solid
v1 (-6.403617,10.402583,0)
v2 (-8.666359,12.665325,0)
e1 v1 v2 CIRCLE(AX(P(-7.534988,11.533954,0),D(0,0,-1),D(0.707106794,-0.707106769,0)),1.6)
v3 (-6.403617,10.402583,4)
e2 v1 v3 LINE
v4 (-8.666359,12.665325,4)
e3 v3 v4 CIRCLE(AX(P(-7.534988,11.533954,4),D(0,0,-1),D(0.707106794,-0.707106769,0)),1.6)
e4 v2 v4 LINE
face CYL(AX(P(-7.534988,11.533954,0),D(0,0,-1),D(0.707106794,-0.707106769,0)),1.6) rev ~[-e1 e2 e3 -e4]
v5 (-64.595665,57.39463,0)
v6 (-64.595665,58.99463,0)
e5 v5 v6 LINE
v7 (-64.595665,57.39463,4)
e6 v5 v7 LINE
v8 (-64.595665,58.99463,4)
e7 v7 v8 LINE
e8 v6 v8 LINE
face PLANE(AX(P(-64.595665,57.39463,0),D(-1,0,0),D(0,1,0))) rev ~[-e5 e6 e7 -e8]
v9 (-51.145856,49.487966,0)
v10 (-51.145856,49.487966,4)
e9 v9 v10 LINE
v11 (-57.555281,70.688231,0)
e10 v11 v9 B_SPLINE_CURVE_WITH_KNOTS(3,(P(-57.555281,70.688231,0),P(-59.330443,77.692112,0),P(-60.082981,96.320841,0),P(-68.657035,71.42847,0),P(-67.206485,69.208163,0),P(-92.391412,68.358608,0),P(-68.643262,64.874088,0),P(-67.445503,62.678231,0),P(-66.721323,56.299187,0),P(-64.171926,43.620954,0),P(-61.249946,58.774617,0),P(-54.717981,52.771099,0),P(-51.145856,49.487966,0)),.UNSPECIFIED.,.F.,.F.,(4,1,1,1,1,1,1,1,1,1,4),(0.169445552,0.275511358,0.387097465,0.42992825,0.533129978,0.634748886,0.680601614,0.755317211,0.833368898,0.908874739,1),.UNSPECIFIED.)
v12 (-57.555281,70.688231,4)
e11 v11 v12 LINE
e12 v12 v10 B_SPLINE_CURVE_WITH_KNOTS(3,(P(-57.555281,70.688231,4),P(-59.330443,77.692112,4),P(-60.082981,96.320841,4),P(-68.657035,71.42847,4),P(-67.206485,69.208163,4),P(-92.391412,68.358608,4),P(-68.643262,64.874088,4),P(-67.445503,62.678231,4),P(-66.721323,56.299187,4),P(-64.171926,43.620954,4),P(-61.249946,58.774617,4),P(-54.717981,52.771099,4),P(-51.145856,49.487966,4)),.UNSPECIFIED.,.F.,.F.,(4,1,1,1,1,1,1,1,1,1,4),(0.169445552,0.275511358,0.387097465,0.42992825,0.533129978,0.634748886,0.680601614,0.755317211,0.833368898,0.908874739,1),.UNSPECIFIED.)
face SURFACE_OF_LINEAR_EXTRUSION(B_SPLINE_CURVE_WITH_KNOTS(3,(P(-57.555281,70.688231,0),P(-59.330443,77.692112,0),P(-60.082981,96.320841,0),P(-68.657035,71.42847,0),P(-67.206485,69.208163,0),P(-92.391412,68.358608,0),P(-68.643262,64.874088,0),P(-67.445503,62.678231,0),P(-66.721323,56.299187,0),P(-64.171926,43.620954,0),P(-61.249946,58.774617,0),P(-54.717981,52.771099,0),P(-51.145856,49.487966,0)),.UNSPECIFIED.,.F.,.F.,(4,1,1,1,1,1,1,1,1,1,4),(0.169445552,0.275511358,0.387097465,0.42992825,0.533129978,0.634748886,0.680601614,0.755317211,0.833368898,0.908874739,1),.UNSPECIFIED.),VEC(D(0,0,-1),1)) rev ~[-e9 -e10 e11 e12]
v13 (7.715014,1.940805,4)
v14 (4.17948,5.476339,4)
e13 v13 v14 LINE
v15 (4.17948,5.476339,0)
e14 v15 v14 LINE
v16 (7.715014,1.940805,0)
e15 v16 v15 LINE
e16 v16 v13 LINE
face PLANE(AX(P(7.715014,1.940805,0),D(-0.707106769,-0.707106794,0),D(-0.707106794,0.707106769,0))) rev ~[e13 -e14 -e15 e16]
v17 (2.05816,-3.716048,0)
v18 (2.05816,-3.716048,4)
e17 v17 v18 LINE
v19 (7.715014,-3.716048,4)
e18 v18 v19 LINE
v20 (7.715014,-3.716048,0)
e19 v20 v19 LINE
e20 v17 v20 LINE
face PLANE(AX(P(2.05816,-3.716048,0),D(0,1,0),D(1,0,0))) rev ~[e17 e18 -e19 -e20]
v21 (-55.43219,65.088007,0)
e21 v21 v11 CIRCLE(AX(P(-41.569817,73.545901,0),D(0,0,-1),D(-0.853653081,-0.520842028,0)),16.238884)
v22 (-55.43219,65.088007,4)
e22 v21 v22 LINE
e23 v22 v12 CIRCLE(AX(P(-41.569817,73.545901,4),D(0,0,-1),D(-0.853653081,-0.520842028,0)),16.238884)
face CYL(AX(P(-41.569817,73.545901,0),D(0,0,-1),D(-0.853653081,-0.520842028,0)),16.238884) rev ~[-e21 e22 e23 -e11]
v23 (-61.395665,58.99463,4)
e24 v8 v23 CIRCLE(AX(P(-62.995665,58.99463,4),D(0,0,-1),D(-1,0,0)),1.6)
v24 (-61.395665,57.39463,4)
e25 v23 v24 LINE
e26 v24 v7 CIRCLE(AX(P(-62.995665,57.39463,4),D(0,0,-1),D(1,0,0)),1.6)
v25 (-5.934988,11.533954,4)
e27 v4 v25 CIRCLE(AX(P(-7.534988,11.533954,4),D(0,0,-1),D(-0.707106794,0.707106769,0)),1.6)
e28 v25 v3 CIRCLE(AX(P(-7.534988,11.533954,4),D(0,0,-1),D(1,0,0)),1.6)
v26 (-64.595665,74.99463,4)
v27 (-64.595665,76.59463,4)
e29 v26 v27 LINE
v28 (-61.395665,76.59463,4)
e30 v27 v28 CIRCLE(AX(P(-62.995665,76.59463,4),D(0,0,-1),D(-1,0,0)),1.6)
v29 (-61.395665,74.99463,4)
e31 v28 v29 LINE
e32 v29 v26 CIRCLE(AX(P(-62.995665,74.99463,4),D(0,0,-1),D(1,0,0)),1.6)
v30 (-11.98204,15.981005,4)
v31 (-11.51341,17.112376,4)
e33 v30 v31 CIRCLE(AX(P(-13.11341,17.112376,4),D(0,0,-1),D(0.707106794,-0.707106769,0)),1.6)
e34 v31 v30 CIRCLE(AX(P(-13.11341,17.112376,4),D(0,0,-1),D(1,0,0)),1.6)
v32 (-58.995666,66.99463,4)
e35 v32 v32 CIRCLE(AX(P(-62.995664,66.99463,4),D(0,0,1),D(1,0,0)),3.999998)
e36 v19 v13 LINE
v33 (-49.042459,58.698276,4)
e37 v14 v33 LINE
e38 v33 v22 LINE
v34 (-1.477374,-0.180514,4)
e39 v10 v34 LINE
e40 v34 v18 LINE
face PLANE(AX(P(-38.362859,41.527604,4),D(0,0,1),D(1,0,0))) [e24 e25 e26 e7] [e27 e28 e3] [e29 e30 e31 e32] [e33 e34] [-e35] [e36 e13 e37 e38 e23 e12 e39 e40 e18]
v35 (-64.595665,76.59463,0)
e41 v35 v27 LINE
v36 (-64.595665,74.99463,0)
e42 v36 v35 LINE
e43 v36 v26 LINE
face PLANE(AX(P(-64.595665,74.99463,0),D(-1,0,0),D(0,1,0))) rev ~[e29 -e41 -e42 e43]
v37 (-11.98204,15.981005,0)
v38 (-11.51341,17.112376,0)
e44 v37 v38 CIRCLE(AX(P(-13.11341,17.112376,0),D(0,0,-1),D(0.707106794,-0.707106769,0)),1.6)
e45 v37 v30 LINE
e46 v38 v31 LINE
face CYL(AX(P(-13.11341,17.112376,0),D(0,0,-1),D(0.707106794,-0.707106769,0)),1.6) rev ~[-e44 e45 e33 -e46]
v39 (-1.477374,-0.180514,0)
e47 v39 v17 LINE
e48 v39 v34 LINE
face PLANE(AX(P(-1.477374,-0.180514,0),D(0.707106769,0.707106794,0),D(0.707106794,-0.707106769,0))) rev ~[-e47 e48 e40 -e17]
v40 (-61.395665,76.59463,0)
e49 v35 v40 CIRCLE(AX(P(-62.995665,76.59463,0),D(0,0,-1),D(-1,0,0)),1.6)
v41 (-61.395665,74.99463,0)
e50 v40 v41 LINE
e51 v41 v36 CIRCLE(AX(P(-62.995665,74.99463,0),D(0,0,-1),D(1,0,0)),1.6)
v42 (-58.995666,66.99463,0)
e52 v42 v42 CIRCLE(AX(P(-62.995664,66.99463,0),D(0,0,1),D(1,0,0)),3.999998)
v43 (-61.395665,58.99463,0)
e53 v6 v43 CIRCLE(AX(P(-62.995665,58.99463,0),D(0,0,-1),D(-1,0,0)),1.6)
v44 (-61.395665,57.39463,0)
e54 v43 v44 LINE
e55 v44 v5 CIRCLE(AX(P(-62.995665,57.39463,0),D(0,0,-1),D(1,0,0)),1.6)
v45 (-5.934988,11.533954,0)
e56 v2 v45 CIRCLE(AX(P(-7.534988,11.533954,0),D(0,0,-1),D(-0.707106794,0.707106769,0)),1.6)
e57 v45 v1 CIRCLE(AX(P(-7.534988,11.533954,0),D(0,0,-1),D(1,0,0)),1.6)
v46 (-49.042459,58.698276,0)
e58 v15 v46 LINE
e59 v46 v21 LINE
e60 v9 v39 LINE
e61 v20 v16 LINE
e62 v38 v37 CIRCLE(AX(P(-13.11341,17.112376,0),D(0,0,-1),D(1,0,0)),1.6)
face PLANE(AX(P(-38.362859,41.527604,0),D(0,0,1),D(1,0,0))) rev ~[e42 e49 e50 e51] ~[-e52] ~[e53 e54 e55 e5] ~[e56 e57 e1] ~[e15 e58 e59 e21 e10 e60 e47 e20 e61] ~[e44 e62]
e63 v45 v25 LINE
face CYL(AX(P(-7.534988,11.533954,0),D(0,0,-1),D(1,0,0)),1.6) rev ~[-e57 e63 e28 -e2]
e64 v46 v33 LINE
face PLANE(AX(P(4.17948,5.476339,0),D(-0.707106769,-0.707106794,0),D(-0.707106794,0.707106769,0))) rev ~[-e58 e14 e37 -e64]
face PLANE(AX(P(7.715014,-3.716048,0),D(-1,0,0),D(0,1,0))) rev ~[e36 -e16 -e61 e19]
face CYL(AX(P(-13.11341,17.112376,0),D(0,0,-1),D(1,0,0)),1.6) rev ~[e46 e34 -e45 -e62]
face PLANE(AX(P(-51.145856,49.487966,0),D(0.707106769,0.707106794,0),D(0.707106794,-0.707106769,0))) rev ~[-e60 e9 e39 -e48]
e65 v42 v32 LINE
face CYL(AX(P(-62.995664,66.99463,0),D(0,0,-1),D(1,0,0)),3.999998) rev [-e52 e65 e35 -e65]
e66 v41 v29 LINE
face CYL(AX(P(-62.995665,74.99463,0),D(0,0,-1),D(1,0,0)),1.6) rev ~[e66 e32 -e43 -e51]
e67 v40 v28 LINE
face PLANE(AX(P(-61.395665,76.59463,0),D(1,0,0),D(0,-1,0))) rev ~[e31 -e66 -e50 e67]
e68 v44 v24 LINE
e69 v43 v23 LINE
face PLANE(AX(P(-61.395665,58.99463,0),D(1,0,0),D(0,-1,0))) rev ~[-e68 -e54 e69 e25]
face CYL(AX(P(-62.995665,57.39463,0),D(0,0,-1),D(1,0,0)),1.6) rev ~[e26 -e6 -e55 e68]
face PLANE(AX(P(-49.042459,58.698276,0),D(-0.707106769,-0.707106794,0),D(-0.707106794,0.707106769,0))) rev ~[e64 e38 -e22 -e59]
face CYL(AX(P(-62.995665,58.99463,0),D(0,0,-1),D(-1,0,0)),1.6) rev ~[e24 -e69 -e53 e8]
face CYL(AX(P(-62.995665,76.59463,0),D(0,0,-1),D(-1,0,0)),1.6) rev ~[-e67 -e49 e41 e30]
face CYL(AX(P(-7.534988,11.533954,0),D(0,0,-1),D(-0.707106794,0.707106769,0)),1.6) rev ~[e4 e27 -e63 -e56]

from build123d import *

# Parameters (mm, degrees)
F0_R     = 3.9999976597
F1_DEPTH = 4


with BuildPart() as f1:
    # F0 (on Top) → F1 (new body)
    with BuildSketch(Plane.XY):
        with BuildLine():
            Line((7.7150141945, 1.9408052288), (4.1794802266, 5.4763390728))
            Line((4.1794802266, 5.4763390728), (-45.8945933996, 55.5504109444))
            Line((-45.8945933996, 55.5504109444), (-49.0424586571, 58.6982760916))
            add(Edge.make_bspline(
                [(-49.0424586571, 58.6982760917), (-50.8783960205, 60.0346249378), (-53.4866069413, 61.6986557194), (-55.4321902376, 65.0880074483)],
                knots=[0.0630834581, 0.0630834581, 0.0630834581, 0.0630834581, 0.1366310285, 0.1366310285, 0.1366310285, 0.1366310285], degree=3))
            ThreePointArc((-55.4321902376, 65.0880074483), (-56.7541503558, 67.7893938967), (-57.5552814645, 70.6882309471))
            add(Edge.make_bspline(
                [(-57.5552814645, 70.6882309471), (-59.3304430199, 77.6921116304), (-60.0829814446, 96.3208412506), (-68.6570351686, 71.4284700086), (-67.2064852054, 69.2081633345), (-92.3914116748, 68.3586081886), (-68.6432624157, 64.8740884961), (-67.4455031945, 62.6782310544), (-66.7213225211, 56.2991866457), (-64.1719257131, 43.6209538428), (-61.2499457456, 58.7746168707), (-54.7179806248, 52.7710993697), (-51.1458562022, 49.4879661793)],
                knots=[0.1694455517, 0.1694455517, 0.1694455517, 0.1694455517, 0.2755113584, 0.3870974654, 0.4299282501, 0.5331299784, 0.6347488857, 0.6806016142, 0.7553172113, 0.8333688983, 0.9088747388, 1, 1, 1, 1], degree=3))
            Line((-51.1458562022, 49.4879661793), (-1.4773740234, -0.1805142459))
            Line((-1.4773740234, -0.1805142459), (2.058159945, -3.7160480894))
            Line((2.058159945, -3.7160480894), (7.7150141945, -3.7160480894))
            Line((7.7150141945, -3.7160480894), (7.7150141945, 1.9408052288))
        make_face()
        with BuildLine():
            ThreePointArc((-6.4036174491, 10.4025831555), (-8.6663591489, 10.4025831156), (-8.6663591888, 12.6653248154))
            ThreePointArc((-8.6663591888, 12.6653248154), (-6.9226948402, 13.0121612429), (-5.934988319, 11.5339539854))
            ThreePointArc((-5.934988319, 11.5339539854), (-6.0567810615, 10.9216605067), (-6.4036174491, 10.4025831555))
        make_face(mode=Mode.SUBTRACT)
        with BuildLine():
            ThreePointArc((-11.9820395129, 15.9810050224), (-14.5916176402, 17.724669331), (-11.5134103828, 17.1123758523))
            ThreePointArc((-11.5134103828, 17.1123758523), (-11.6352031253, 16.5000823736), (-11.9820395129, 15.9810050224))
        make_face(mode=Mode.SUBTRACT)
        with BuildLine():
            ThreePointArc((-61.3956648634, 57.3946300292), (-62.9956648634, 55.7946300292), (-64.5956648634, 57.3946300292))
            Line((-64.5956648634, 57.3946300292), (-64.5956648634, 58.9946300292))
            ThreePointArc((-64.5956648634, 58.9946300292), (-62.9956648634, 60.5946300292), (-61.3956648634, 58.9946300292))
            Line((-61.3956648634, 58.9946300292), (-61.3956648634, 57.3946300292))
        make_face(mode=Mode.SUBTRACT)
        with Locations((-62.9956639242, 66.9946300292)):
            Circle(F0_R, mode=Mode.SUBTRACT)
        with BuildLine():
            ThreePointArc((-64.5956648634, 76.5946300292), (-62.9956648634, 78.1946300292), (-61.3956648634, 76.5946300292))
            Line((-61.3956648634, 76.5946300292), (-61.3956648634, 74.9946300292))
            ThreePointArc((-61.3956648634, 74.9946300292), (-62.9956648634, 73.3946300292), (-64.5956648634, 74.9946300292))
            Line((-64.5956648634, 74.9946300292), (-64.5956648634, 76.5946300292))
        make_face(mode=Mode.SUBTRACT)
        with BuildLine():
            add(Edge.make_bspline(
                [(-49.0424586571, 58.6982760917), (-50.8783960205, 60.0346249378), (-53.4866069413, 61.6986557194), (-55.4321902376, 65.0880074483)],
                knots=[0.0630834581, 0.0630834581, 0.0630834581, 0.0630834581, 0.1366310285, 0.1366310285, 0.1366310285, 0.1366310285], degree=3))
            Line((-49.0424586571, 58.6982760916), (-55.4321902376, 65.0880074483))
        make_face()
    extrude(amount=F1_DEPTH)


solid = f1.part
